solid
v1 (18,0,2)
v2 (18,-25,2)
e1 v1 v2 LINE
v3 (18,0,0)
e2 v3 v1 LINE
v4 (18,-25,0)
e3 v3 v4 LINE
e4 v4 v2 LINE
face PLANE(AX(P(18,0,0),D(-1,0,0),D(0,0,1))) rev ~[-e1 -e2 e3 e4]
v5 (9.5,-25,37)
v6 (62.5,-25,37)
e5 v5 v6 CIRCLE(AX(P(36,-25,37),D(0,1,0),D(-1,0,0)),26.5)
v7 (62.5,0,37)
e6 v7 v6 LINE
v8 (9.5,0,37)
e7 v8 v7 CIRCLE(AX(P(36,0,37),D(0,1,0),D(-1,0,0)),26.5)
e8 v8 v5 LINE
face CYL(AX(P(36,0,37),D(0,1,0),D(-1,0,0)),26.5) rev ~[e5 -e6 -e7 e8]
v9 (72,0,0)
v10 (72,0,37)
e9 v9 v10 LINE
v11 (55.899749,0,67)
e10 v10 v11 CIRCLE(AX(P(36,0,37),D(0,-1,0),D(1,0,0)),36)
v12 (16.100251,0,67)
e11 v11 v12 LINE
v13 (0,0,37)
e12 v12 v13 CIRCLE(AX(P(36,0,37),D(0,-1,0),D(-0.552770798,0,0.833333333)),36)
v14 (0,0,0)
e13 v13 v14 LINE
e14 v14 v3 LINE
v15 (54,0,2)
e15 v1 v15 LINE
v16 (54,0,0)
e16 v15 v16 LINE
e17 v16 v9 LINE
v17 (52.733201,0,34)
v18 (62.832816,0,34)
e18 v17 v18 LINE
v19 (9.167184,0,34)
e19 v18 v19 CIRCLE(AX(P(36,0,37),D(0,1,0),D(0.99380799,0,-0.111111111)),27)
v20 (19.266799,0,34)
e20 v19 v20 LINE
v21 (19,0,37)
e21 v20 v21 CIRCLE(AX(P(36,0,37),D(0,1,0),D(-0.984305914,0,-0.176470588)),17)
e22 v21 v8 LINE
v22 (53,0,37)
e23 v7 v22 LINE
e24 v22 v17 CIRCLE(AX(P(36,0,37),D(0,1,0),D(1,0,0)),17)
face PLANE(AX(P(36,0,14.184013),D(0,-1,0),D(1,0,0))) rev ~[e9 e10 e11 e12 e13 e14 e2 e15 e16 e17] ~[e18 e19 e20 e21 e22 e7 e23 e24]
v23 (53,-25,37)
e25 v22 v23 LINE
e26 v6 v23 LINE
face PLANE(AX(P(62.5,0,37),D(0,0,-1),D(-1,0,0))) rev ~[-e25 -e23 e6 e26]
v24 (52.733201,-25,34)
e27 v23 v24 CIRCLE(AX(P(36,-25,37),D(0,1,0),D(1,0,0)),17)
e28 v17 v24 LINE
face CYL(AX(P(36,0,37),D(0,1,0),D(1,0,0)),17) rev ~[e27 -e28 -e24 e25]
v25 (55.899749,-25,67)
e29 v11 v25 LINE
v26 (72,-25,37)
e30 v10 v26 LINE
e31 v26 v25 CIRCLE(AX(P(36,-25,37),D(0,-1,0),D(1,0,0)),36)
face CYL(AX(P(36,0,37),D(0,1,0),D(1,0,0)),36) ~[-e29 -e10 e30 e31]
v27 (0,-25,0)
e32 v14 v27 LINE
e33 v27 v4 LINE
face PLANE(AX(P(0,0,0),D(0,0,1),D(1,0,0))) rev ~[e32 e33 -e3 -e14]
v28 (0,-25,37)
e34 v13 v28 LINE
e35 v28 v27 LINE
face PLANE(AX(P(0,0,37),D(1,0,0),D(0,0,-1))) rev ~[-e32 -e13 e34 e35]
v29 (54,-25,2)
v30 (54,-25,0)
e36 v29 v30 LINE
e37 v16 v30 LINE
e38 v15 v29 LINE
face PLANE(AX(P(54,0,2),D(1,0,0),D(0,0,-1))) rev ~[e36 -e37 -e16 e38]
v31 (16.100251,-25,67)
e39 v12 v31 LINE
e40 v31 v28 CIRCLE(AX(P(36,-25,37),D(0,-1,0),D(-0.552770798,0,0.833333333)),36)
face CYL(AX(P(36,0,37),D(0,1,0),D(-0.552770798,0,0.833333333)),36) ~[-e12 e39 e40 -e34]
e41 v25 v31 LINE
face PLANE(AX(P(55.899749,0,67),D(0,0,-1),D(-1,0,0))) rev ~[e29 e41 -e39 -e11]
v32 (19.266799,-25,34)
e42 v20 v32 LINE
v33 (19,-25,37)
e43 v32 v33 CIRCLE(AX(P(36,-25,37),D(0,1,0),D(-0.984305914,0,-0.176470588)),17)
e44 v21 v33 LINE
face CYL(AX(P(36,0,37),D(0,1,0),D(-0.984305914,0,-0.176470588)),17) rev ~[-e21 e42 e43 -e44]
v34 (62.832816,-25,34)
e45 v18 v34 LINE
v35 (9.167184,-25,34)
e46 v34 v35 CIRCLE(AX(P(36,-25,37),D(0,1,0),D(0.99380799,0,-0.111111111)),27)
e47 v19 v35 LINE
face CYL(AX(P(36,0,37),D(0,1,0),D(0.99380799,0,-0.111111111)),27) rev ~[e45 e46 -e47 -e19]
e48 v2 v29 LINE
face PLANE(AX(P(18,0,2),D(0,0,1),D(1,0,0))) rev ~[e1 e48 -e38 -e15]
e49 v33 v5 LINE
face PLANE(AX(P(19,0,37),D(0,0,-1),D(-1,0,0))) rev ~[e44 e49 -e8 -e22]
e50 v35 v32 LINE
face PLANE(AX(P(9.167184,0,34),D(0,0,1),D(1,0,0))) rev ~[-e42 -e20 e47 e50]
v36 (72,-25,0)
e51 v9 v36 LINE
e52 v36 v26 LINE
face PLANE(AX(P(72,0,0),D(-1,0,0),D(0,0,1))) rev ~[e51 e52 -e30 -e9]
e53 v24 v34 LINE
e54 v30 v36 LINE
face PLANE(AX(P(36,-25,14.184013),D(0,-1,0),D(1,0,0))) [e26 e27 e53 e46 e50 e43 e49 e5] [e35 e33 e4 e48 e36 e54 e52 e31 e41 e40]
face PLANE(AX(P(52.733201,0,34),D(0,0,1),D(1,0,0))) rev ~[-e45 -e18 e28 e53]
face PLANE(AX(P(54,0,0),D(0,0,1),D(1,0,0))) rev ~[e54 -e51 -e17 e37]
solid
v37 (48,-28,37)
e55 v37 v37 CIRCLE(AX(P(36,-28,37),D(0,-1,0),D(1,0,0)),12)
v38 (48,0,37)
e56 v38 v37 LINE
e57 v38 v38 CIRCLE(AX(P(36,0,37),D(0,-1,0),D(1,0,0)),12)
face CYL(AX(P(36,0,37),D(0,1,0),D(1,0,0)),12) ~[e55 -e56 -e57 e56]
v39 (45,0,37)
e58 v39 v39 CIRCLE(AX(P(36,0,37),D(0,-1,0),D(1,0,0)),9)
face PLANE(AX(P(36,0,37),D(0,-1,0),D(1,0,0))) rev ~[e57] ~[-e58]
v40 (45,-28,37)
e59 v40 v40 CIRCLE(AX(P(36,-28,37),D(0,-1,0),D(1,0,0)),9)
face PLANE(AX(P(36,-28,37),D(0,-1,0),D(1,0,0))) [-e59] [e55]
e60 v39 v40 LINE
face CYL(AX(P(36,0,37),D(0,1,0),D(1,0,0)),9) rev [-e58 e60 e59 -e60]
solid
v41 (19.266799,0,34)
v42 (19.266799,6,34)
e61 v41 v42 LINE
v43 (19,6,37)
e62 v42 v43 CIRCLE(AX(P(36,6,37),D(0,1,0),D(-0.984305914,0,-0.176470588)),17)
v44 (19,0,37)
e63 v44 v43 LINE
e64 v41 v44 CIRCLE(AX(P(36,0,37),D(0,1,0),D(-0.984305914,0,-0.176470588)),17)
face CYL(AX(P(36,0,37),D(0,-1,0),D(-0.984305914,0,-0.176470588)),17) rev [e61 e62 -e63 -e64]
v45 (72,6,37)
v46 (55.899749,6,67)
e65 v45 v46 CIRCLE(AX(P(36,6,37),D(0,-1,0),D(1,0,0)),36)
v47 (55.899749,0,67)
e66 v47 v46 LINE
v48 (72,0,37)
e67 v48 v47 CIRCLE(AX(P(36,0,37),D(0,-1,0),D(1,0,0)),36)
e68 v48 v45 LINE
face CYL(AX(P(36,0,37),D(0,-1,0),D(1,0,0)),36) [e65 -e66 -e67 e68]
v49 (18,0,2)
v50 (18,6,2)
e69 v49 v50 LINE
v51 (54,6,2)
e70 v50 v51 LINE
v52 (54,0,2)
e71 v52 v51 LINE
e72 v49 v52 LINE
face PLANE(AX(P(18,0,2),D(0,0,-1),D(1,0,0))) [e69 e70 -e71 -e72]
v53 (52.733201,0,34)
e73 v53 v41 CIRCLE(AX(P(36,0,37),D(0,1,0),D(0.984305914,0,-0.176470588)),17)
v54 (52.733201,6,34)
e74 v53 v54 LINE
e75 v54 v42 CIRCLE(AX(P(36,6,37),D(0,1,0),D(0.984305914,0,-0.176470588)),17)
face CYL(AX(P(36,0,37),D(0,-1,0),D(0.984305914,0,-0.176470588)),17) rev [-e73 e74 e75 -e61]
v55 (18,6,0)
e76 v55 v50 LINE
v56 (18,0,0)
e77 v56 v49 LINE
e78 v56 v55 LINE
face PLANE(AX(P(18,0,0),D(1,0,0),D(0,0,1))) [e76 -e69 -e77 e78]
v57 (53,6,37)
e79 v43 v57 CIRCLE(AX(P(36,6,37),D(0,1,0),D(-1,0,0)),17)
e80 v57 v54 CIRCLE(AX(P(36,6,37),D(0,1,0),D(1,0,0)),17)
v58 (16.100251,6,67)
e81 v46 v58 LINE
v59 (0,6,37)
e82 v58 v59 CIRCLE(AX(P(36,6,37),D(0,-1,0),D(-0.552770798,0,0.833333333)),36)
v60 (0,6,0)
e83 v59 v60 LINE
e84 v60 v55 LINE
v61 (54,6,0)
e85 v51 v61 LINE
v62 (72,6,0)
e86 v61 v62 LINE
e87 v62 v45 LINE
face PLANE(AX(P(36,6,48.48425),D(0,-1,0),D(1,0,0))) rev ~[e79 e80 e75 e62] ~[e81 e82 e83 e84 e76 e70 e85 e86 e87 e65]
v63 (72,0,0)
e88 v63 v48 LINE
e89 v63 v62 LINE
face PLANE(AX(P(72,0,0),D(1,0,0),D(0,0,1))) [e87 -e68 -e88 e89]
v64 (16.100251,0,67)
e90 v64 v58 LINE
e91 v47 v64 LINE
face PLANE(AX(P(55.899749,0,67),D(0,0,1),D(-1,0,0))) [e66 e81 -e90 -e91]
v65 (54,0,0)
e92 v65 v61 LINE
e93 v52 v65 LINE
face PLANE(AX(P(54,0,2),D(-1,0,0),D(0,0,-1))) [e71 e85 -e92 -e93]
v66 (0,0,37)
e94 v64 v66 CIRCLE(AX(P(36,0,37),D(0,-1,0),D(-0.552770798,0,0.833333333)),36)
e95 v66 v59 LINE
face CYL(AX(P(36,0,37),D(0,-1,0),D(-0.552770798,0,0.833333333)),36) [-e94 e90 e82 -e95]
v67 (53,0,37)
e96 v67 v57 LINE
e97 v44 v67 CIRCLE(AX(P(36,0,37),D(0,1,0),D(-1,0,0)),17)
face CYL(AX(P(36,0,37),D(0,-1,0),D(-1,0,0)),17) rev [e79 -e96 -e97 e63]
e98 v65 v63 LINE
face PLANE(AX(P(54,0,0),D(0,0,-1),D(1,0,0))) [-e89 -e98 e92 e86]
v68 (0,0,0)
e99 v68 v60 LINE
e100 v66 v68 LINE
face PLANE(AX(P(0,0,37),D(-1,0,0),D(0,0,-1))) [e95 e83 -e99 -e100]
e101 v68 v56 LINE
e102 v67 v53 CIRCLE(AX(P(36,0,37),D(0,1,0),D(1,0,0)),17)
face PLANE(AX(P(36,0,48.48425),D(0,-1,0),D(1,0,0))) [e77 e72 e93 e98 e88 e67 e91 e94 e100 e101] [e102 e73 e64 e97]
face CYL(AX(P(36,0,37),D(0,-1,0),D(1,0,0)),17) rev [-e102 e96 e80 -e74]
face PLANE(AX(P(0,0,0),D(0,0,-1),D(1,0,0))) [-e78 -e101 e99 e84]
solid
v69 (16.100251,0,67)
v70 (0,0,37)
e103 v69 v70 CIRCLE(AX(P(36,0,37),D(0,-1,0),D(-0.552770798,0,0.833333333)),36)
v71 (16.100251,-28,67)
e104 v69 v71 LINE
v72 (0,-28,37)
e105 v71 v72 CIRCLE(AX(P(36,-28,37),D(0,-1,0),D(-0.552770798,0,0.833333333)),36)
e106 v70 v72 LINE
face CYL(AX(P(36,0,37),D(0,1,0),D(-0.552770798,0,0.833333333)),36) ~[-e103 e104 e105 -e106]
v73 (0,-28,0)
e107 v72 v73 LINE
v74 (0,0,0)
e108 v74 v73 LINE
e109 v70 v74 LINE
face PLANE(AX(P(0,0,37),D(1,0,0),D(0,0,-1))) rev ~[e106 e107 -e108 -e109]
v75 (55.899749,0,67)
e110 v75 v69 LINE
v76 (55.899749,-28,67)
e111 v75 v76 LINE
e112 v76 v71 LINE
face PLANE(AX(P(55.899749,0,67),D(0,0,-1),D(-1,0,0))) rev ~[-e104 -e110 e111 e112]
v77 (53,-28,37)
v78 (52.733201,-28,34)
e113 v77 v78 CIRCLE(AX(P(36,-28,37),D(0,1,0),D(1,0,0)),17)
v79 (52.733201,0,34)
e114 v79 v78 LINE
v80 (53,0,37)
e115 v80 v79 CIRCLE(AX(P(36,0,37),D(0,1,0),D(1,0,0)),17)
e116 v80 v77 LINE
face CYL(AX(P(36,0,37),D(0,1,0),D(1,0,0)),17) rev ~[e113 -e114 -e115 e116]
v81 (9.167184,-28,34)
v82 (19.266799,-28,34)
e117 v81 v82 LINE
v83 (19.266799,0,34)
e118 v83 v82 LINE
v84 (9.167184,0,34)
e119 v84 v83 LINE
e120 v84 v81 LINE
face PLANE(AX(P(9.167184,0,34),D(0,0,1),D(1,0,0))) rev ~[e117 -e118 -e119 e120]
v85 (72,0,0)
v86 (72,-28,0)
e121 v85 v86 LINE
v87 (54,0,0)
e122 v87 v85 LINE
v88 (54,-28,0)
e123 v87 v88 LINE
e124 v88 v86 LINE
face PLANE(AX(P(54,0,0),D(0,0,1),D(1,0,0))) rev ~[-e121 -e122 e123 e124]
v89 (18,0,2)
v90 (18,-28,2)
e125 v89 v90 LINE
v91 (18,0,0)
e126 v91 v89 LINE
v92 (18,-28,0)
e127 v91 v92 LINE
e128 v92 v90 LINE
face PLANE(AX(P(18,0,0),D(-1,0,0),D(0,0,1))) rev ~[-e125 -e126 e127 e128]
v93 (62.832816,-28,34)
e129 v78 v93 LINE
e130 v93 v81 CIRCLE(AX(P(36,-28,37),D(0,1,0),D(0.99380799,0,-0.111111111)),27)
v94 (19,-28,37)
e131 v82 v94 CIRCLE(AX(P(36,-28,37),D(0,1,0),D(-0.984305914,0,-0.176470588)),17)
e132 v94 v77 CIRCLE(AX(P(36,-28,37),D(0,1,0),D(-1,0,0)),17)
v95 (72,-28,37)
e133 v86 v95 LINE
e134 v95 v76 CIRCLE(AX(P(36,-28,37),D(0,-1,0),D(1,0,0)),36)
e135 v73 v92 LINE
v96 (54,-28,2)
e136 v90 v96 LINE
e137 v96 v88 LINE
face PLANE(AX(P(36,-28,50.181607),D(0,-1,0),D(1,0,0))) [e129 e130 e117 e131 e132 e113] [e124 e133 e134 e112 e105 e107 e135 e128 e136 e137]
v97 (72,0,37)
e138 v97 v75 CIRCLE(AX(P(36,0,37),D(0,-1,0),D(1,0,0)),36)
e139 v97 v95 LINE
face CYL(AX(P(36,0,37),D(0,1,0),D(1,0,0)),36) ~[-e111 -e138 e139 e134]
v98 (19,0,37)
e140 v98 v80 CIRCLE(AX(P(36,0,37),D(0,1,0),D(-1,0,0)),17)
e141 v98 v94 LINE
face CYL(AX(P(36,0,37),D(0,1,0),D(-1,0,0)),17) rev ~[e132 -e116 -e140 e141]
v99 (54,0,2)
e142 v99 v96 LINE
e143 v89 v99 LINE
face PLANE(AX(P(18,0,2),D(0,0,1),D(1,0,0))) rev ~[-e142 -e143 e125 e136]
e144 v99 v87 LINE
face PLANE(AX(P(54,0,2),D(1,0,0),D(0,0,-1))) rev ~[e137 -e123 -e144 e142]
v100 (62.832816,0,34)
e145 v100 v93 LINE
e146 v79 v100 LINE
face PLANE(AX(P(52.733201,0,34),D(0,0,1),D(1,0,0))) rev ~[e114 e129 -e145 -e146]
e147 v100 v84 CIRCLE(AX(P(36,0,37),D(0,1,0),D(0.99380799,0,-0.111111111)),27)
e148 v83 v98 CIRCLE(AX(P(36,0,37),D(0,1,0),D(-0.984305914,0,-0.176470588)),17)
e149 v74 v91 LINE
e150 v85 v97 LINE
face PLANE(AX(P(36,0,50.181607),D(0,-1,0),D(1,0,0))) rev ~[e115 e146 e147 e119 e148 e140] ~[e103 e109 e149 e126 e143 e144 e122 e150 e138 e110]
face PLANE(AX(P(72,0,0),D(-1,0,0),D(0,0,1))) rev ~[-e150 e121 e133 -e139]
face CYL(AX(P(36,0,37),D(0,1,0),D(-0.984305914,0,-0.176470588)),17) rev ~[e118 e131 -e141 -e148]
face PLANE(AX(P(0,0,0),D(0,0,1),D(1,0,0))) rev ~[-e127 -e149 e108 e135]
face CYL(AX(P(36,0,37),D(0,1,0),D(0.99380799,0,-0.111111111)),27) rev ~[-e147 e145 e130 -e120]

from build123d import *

# Parameters (mm, degrees)
F1_DEPTH = 28
F0_R     = 9
F2_DEPTH = 6
F3_DEPTH = 25


# Not quite as in the source:
# - a feature names something its author has since deleted; it is built from what else it names


with BuildPart() as f1:
    # F0 (on Front) → F1 (new body)
    with BuildSketch(Plane.XZ):
        with BuildLine():
            Line((0, 37), (0, 34))
            Line((0, 34), (9.16718427, 34))
            Line((9.16718427, 34), (9.6703589086, 34))
            Line((9.6703589086, 34), (16.2262800667, 34))
            Line((16.2262800667, 34), (19.2667994693, 34))
            ThreePointArc((19.2667994693, 34), (19.0668312324, 35.494079853), (19, 37))
            Line((19, 37), (9.5, 37))
            ThreePointArc((9.5, 37), (36, 63.5), (62.5, 37))
            Line((62.5, 37), (53, 37))
            ThreePointArc((53, 37), (52.9331687676, 35.494079853), (52.7332005307, 34))
            Line((52.7332005307, 34), (62.83281573, 34))
            Line((62.83281573, 34), (72, 34))
            Line((72, 34), (72, 37))
            ThreePointArc((72, 37), (67.7205844423, 54.0236459856), (55.8997487421, 67))
            Line((55.8997487421, 67), (16.1002512579, 67))
            ThreePointArc((16.1002512579, 67), (4.2794155577, 54.0236459856), (0, 37))
        make_face()
        with BuildLine():
            ThreePointArc((19, 37), (36, 54), (53, 37))
            Line((53, 37), (62.5, 37))
            ThreePointArc((62.5, 37), (36, 63.5), (9.5, 37))
            Line((9.5, 37), (19, 37))
        make_face()
        with BuildLine():
            Line((0, 34), (0, 0))
            Line((0, 0), (18, 0))
            Line((18, 0), (18, 2))
            Line((18, 2), (54, 2))
            Line((54, 2), (54, 0))
            Line((54, 0), (72, 0))
            Line((72, 0), (72, 34))
            Line((72, 34), (62.83281573, 34))
            ThreePointArc((62.83281573, 34), (36, 10), (9.16718427, 34))
            Line((9.16718427, 34), (0, 34))
        make_face()
    extrude(amount=F1_DEPTH)


with BuildPart() as f1b:
    # F0 (on Front) → F1, piece 2 (new body)
    with BuildSketch(Plane.XZ):
        with BuildLine():
            ThreePointArc((24, 37), (36, 25), (48, 37))
            ThreePointArc((48, 37), (36, 49), (24, 37))
        make_face()
        with Locations((36, 37)):
            Circle(F0_R, mode=Mode.SUBTRACT)
    extrude(amount=F1_DEPTH)


with BuildPart() as f2:
    # F0 (on Front) → F2 (new body)
    with BuildSketch(Plane.XZ):
        with BuildLine():
            ThreePointArc((19, 37), (36, 54), (53, 37))
            Line((53, 37), (62.5, 37))
            ThreePointArc((62.5, 37), (36, 63.5), (9.5, 37))
            Line((9.5, 37), (19, 37))
        make_face()
        with BuildLine():
            Line((0, 37), (0, 34))
            Line((0, 34), (9.16718427, 34))
            Line((9.16718427, 34), (9.6703589086, 34))
            Line((9.6703589086, 34), (16.2262800667, 34))
            Line((16.2262800667, 34), (19.2667994693, 34))
            ThreePointArc((19.2667994693, 34), (19.0668312324, 35.494079853), (19, 37))
            Line((19, 37), (9.5, 37))
            ThreePointArc((9.5, 37), (36, 63.5), (62.5, 37))
            Line((62.5, 37), (53, 37))
            ThreePointArc((53, 37), (52.9331687676, 35.494079853), (52.7332005307, 34))
            Line((52.7332005307, 34), (62.83281573, 34))
            Line((62.83281573, 34), (72, 34))
            Line((72, 34), (72, 37))
            ThreePointArc((72, 37), (67.7205844423, 54.0236459856), (55.8997487421, 67))
            Line((55.8997487421, 67), (16.1002512579, 67))
            ThreePointArc((16.1002512579, 67), (4.2794155577, 54.0236459856), (0, 37))
        make_face()
        with BuildLine():
            Line((0, 34), (0, 0))
            Line((0, 0), (18, 0))
            Line((18, 0), (18, 2))
            Line((18, 2), (54, 2))
            Line((54, 2), (54, 0))
            Line((54, 0), (72, 0))
            Line((72, 0), (72, 34))
            Line((72, 34), (62.83281573, 34))
            ThreePointArc((62.83281573, 34), (36, 10), (9.16718427, 34))
            Line((9.16718427, 34), (0, 34))
        make_face()
        with BuildLine():
            Line((9.6703589086, 34), (9.16718427, 34))
            ThreePointArc((9.16718427, 34), (36, 10), (62.83281573, 34))
            Line((62.83281573, 34), (52.7332005307, 34))
            ThreePointArc((52.7332005307, 34), (36, 20), (19.2667994693, 34))
            Line((19.2667994693, 34), (16.2262800667, 34))
            Line((16.2262800667, 34), (9.6703589086, 34))
        make_face()
    extrude(amount=-F2_DEPTH)


with BuildPart() as f3:
    # F0 (on Front) → F3 (new body)
    with BuildSketch(Plane.XZ):
        with BuildLine():
            Line((0, 34), (0, 0))
            Line((0, 0), (18, 0))
            Line((18, 0), (18, 2))
            Line((18, 2), (54, 2))
            Line((54, 2), (54, 0))
            Line((54, 0), (72, 0))
            Line((72, 0), (72, 34))
            Line((72, 34), (62.83281573, 34))
            ThreePointArc((62.83281573, 34), (36, 10), (9.16718427, 34))
            Line((9.16718427, 34), (0, 34))
        make_face()
        with BuildLine():
            Line((0, 37), (0, 34))
            Line((0, 34), (9.16718427, 34))
            Line((9.16718427, 34), (9.6703589086, 34))
            Line((9.6703589086, 34), (16.2262800667, 34))
            Line((16.2262800667, 34), (19.2667994693, 34))
            ThreePointArc((19.2667994693, 34), (19.0668312324, 35.494079853), (19, 37))
            Line((19, 37), (9.5, 37))
            ThreePointArc((9.5, 37), (36, 63.5), (62.5, 37))
            Line((62.5, 37), (53, 37))
            ThreePointArc((53, 37), (52.9331687676, 35.494079853), (52.7332005307, 34))
            Line((52.7332005307, 34), (62.83281573, 34))
            Line((62.83281573, 34), (72, 34))
            Line((72, 34), (72, 37))
            ThreePointArc((72, 37), (67.7205844423, 54.0236459856), (55.8997487421, 67))
            Line((55.8997487421, 67), (16.1002512579, 67))
            ThreePointArc((16.1002512579, 67), (4.2794155577, 54.0236459856), (0, 37))
        make_face()
    extrude(amount=F3_DEPTH)


solid = Compound([f1.part, f1b.part, f2.part, f3.part])
